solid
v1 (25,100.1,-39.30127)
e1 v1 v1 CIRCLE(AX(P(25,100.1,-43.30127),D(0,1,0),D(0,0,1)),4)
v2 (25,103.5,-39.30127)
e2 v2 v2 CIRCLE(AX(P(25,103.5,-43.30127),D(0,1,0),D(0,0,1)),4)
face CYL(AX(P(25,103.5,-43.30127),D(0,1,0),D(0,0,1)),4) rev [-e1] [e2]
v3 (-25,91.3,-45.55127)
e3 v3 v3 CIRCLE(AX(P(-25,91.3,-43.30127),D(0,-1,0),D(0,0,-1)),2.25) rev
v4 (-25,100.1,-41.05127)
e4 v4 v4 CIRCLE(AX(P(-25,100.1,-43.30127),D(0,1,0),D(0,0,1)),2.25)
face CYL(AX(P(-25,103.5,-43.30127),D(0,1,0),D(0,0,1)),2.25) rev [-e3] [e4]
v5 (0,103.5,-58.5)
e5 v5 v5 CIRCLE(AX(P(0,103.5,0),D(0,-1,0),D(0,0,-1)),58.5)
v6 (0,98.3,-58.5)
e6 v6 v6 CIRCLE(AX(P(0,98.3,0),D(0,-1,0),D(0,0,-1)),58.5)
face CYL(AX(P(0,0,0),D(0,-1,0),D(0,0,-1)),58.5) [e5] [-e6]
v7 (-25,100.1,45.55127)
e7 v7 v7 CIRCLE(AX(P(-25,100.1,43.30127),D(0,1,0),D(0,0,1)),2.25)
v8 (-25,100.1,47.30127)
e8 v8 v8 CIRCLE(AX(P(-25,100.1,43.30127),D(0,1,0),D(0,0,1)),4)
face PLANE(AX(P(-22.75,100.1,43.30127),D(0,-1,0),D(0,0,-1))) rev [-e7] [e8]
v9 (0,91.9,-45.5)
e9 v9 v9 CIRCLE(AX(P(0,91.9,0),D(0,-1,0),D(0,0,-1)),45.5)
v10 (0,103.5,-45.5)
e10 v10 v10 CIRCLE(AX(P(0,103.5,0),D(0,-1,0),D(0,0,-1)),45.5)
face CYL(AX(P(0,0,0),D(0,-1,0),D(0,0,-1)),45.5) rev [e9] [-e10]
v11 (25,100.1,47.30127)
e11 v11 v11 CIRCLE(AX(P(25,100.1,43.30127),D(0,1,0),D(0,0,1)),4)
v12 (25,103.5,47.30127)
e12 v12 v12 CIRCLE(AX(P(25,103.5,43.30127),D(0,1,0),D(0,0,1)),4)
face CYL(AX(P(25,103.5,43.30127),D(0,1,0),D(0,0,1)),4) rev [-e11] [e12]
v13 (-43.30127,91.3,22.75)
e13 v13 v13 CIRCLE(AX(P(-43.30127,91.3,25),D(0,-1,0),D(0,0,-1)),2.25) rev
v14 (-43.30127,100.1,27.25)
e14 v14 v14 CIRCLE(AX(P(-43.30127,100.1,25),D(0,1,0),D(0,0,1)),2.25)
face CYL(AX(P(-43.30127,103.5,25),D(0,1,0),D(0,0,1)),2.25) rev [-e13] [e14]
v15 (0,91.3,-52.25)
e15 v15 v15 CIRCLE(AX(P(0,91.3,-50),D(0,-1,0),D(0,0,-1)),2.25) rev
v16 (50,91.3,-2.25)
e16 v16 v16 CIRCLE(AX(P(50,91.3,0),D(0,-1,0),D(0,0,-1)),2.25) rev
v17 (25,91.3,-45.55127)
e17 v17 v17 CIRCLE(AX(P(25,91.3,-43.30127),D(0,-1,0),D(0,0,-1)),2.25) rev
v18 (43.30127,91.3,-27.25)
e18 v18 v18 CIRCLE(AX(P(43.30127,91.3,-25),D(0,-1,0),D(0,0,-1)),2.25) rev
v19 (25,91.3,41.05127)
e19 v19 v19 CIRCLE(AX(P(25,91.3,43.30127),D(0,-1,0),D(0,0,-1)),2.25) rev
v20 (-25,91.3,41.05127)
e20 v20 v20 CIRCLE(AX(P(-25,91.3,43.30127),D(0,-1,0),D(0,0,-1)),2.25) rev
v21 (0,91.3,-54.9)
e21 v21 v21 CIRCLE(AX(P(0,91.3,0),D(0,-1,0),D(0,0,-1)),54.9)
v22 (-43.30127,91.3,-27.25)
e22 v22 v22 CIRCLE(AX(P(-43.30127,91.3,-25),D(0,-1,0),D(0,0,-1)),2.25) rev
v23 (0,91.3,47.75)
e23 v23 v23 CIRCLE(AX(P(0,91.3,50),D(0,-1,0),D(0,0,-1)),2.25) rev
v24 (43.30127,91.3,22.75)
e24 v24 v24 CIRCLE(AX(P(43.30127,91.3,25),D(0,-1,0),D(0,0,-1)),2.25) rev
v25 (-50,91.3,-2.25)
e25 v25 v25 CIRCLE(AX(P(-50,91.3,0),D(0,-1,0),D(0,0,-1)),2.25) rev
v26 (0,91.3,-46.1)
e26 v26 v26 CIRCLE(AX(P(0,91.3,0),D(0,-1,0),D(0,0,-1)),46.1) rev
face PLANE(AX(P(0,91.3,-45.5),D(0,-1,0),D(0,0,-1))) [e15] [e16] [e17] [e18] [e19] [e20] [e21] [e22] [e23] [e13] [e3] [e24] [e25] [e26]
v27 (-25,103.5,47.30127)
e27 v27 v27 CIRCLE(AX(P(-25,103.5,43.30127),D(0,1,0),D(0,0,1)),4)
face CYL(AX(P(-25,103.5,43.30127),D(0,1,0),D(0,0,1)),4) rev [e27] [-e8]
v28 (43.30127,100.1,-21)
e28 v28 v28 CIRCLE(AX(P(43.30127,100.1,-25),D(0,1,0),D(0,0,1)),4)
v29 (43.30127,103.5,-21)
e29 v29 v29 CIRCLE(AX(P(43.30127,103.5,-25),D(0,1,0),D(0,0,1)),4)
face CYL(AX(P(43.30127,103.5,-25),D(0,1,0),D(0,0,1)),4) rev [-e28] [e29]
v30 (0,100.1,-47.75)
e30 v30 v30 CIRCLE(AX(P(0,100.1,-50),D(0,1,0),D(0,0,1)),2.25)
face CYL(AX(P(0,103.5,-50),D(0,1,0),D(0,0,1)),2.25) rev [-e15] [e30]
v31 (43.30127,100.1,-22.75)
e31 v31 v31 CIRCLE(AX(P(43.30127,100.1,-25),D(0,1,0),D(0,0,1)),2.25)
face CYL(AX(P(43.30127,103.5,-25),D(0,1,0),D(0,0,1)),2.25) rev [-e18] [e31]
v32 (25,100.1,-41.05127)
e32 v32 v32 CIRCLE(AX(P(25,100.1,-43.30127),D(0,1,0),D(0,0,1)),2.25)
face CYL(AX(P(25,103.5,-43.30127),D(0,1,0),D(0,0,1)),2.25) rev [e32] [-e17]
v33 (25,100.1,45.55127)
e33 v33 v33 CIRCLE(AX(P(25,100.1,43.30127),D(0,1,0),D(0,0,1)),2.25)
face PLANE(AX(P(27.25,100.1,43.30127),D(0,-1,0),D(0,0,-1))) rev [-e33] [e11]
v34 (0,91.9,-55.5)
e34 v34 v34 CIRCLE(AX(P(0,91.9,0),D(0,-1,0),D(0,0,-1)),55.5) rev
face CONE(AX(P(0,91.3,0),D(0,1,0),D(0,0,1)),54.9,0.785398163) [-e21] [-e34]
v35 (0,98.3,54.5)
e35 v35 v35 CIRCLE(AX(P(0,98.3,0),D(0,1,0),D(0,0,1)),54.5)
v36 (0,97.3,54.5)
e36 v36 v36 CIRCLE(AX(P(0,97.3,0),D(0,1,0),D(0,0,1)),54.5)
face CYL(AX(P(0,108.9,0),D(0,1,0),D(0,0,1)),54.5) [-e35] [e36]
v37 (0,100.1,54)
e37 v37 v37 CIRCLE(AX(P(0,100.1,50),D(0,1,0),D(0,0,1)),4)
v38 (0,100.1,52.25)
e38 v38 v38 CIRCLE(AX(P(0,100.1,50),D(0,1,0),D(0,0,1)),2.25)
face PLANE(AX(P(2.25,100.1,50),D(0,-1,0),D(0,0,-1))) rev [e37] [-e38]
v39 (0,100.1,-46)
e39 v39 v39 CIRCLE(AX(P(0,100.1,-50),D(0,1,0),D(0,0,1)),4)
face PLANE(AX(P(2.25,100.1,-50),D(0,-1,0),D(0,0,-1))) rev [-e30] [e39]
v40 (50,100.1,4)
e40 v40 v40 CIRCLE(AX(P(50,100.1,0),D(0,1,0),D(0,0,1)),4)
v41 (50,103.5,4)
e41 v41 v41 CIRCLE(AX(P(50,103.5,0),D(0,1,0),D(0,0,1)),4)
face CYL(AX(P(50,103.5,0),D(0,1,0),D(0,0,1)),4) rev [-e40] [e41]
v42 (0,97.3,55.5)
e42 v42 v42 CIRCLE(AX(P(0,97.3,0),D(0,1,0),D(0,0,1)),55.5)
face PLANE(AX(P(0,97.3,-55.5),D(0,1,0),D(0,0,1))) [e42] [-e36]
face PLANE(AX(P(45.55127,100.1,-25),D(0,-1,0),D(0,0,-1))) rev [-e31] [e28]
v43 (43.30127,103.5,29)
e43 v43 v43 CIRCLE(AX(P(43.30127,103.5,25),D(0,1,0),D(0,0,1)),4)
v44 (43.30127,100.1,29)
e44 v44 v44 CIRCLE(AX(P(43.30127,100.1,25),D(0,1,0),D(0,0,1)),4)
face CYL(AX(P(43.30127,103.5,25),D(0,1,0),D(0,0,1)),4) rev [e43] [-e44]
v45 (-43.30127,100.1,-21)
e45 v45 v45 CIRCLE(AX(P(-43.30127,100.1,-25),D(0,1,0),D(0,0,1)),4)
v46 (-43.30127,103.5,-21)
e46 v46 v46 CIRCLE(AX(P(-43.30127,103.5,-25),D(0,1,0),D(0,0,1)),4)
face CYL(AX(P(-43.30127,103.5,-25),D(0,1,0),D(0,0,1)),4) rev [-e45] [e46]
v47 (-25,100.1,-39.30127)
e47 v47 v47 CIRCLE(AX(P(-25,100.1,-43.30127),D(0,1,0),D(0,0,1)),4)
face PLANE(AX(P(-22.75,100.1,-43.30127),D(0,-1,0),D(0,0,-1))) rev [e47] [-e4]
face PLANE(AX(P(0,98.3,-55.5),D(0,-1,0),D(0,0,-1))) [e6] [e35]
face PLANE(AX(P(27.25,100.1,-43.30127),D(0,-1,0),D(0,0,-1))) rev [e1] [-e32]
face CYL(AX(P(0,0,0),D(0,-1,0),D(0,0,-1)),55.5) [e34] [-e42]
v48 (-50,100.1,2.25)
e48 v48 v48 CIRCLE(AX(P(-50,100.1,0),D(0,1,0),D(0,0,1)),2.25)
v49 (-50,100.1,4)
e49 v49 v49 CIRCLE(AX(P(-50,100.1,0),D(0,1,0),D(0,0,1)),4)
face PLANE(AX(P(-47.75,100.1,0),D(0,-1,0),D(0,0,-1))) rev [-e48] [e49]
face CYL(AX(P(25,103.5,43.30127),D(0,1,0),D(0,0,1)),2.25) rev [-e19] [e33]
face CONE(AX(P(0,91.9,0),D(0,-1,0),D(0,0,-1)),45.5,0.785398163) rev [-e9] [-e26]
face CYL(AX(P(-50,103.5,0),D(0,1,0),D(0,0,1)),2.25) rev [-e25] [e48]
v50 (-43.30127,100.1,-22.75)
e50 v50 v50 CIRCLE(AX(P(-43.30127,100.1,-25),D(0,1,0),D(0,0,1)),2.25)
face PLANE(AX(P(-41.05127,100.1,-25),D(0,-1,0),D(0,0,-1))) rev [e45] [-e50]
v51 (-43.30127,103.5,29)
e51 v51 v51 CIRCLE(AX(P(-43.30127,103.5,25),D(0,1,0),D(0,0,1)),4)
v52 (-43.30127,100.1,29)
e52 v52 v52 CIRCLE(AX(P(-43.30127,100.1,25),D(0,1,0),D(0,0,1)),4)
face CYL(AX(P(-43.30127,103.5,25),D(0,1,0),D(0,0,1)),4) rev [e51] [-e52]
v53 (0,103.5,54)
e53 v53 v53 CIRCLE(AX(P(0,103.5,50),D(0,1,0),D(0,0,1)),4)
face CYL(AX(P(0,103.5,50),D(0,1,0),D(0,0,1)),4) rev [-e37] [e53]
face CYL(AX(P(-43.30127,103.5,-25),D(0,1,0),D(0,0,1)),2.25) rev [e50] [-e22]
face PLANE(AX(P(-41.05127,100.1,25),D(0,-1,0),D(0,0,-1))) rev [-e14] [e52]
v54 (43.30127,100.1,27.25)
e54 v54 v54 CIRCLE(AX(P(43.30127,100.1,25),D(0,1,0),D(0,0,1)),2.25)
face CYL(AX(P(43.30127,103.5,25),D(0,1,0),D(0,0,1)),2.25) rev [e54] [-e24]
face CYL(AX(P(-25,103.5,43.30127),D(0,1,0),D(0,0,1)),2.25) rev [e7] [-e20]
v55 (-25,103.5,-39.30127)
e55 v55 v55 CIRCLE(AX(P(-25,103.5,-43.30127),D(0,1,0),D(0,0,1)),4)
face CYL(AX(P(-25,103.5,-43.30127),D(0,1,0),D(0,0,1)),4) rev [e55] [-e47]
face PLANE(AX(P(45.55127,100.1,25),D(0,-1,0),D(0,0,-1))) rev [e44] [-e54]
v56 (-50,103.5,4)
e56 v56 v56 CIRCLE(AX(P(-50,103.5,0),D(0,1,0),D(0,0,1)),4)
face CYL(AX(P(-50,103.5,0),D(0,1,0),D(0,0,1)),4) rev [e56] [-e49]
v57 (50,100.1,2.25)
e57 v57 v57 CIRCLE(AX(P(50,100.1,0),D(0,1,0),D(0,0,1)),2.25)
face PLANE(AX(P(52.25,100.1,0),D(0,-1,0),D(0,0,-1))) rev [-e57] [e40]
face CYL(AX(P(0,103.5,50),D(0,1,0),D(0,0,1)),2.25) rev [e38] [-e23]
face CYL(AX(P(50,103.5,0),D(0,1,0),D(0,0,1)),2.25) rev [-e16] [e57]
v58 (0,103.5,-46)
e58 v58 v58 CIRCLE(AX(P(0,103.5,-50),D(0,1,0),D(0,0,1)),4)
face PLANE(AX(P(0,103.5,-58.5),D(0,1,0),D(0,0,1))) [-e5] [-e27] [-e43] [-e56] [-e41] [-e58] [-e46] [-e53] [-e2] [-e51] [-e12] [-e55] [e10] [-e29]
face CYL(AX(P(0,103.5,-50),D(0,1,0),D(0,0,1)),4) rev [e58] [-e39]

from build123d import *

# Parameters (mm, degrees)
CBORE_FOR_M4_HEX_SOCKET_HEAD_CAP_SCR_2_COUNT  = 2
CBORE_FOR_M4_HEX_SOCKET_HEAD_CAP_SCR_2_PITCH  = 25.88190451
CBORE_FOR_M4_HEX_SOCKET_HEAD_CAP_SCR_3_COUNT  = 2
CBORE_FOR_M4_HEX_SOCKET_HEAD_CAP_SCR_3_PITCH  = 50
CBORE_FOR_M4_HEX_SOCKET_HEAD_CAP_SCR_4_COUNT  = 2
CBORE_FOR_M4_HEX_SOCKET_HEAD_CAP_SCR_4_PITCH  = 70.710678119
CBORE_FOR_M4_HEX_SOCKET_HEAD_CAP_SCR_5_COUNT  = 2
CBORE_FOR_M4_HEX_SOCKET_HEAD_CAP_SCR_5_PITCH  = 86.602540378
CBORE_FOR_M4_HEX_SOCKET_HEAD_CAP_SCR_6_COUNT  = 2
CBORE_FOR_M4_HEX_SOCKET_HEAD_CAP_SCR_6_PITCH  = 96.592582629
CBORE_FOR_M4_HEX_SOCKET_HEAD_CAP_SCR_7_COUNT  = 2
CBORE_FOR_M4_HEX_SOCKET_HEAD_CAP_SCR_7_PITCH  = 100
CBORE_FOR_M4_HEX_SOCKET_HEAD_CAP_SCR_8_COUNT  = 2
CBORE_FOR_M4_HEX_SOCKET_HEAD_CAP_SCR_8_PITCH  = 96.592582629
CBORE_FOR_M4_HEX_SOCKET_HEAD_CAP_SCR_9_COUNT  = 2
CBORE_FOR_M4_HEX_SOCKET_HEAD_CAP_SCR_9_PITCH  = 86.602540378
CBORE_FOR_M4_HEX_SOCKET_HEAD_CAP_SCR_10_COUNT = 2
CBORE_FOR_M4_HEX_SOCKET_HEAD_CAP_SCR_10_PITCH = 70.710678119
CBORE_FOR_M4_HEX_SOCKET_HEAD_CAP_SCR_11_COUNT = 2
CBORE_FOR_M4_HEX_SOCKET_HEAD_CAP_SCR_11_PITCH = 50
CBORE_FOR_M4_HEX_SOCKET_HEAD_CAP_SCR_12_COUNT = 2
CBORE_FOR_M4_HEX_SOCKET_HEAD_CAP_SCR_12_PITCH = 25.88190451
M4_TAPPED_HOLE1_AT_2_COUNT                    = 2
M4_TAPPED_HOLE1_AT_2_PITCH                    = 25.88190451
M4_TAPPED_HOLE1_AT_3_COUNT                    = 2
M4_TAPPED_HOLE1_AT_3_PITCH                    = 50
M4_TAPPED_HOLE1_AT_4_COUNT                    = 2
M4_TAPPED_HOLE1_AT_4_PITCH                    = 70.710678119
M4_TAPPED_HOLE1_AT_5_COUNT                    = 2
M4_TAPPED_HOLE1_AT_5_PITCH                    = 86.602540378
M4_TAPPED_HOLE1_AT_6_COUNT                    = 2
M4_TAPPED_HOLE1_AT_6_PITCH                    = 96.592582629
M4_TAPPED_HOLE1_AT_7_COUNT                    = 2
M4_TAPPED_HOLE1_AT_7_PITCH                    = 100
M4_TAPPED_HOLE1_AT_8_COUNT                    = 2
M4_TAPPED_HOLE1_AT_8_PITCH                    = 96.592582629
M4_TAPPED_HOLE1_AT_9_COUNT                    = 2
M4_TAPPED_HOLE1_AT_9_PITCH                    = 86.602540378
M4_TAPPED_HOLE1_AT_10_COUNT                   = 2
M4_TAPPED_HOLE1_AT_10_PITCH                   = 70.710678119
M4_TAPPED_HOLE1_AT_11_COUNT                   = 2
M4_TAPPED_HOLE1_AT_11_PITCH                   = 50
M4_TAPPED_HOLE1_AT_12_COUNT                   = 2
M4_TAPPED_HOLE1_AT_12_PITCH                   = 25.88190451
SKETCH36_W                                    = 2.25
SKETCH36_H                                    = 3.5
M4_CLEARANCE_HOLE1_AT_2_COUNT                 = 2
M4_CLEARANCE_HOLE1_AT_2_PITCH                 = 35.58955921
M4_CLEARANCE_HOLE1_AT_3_COUNT                 = 2
M4_CLEARANCE_HOLE1_AT_3_PITCH                 = 65.76093065
M4_CLEARANCE_HOLE1_AT_4_COUNT                 = 2
M4_CLEARANCE_HOLE1_AT_4_PITCH                 = 85.920796524
M4_CLEARANCE_HOLE1_AT_5_COUNT                 = 2
M4_CLEARANCE_HOLE1_AT_5_PITCH                 = 93
M4_CLEARANCE_HOLE1_AT_6_COUNT                 = 2
M4_CLEARANCE_HOLE1_AT_6_PITCH                 = 85.920796524
M4_CLEARANCE_HOLE1_AT_7_COUNT                 = 2
M4_CLEARANCE_HOLE1_AT_7_PITCH                 = 65.76093065
M4_CLEARANCE_HOLE1_AT_8_COUNT                 = 2
M4_CLEARANCE_HOLE1_AT_8_PITCH                 = 35.58955921
M4_TAPPED_HOLE2_AT_2_COUNT                    = 2
M4_TAPPED_HOLE2_AT_2_PITCH                    = 35.58955921
M4_TAPPED_HOLE2_AT_3_COUNT                    = 2
M4_TAPPED_HOLE2_AT_3_PITCH                    = 35.58955921
M4_TAPPED_HOLE2_AT_4_COUNT                    = 2
M4_TAPPED_HOLE2_AT_4_PITCH                    = 65.76093065
M4_TAPPED_HOLE2_AT_5_COUNT                    = 2
M4_TAPPED_HOLE2_AT_5_PITCH                    = 65.76093065
M4_TAPPED_HOLE2_AT_6_COUNT                    = 2
M4_TAPPED_HOLE2_AT_6_PITCH                    = 85.920796524
M4_TAPPED_HOLE2_AT_7_COUNT                    = 2
M4_TAPPED_HOLE2_AT_7_PITCH                    = 93
M4_TAPPED_HOLE2_AT_8_COUNT                    = 2
M4_TAPPED_HOLE2_AT_8_PITCH                    = 85.920796524
SKETCH53_W                                    = 2.5
SKETCH53_H                                    = 54.5
M6_TAPPED_HOLE1_AT_2_COUNT                    = 2
M6_TAPPED_HOLE1_AT_2_PITCH                    = 45
MIRROR1_COPY_1_SKETCH_W                       = 2.5
MIRROR1_COPY_1_SKETCH_H                       = 54.5
SKETCH66_W                                    = 2.5
SKETCH66_H                                    = 54.5
M6_TAPPED_HOLE2_AT_2_COUNT                    = 2
M6_TAPPED_HOLE2_AT_2_PITCH                    = 45
MIRROR2_COPY_1_SKETCH_W                       = 2.5
MIRROR2_COPY_1_SKETCH_H                       = 54.5
SKETCH69_W                                    = 1
SKETCH69_H                                    = 1
CHAMFER5_SIZE                                 = 0.5
MOVE_FACE2_BY                                 = 0.5
MOVE_FACE3_BY                                 = 1
CHAMFER1_SIZE                                 = 0.6
CHAMFER2_SIZE                                 = 0.6
FILLET3_R                                     = 0.4
CHAMFER3_SIZE                                 = 2
M6_START                                      = -56
M6_TAPPED_HOLE3_OUTLINE_R                     = 2.5
M6_TAPPED_HOLE3_DEPTH                         = 14
CHAMFER4_SIZE                                 = 0.6
CHAMFER6_SIZE                                 = 0.6
FILLET4_R                                     = 0.4
CHAMFER7_SIZE                                 = 1
CHAMFER7_SIZE2                                = 1.732050808
CHAMFER8_SIZE                                 = 0.5
CHAMFER8_SIZE2                                = 0.866025404


with BuildPart() as part:
    # Sketch1 → Revolve1 (revolve)
    with BuildSketch(Plane(origin=(0, 0, 0), x_dir=(0, 0, -1), z_dir=(1, 0, 0))):
        Polygon((37, 103.8), (37, 100.8), (30.5, 100.8), (30.5, 96.8), (40, 93), (40, 91), (42.5, 91), (42.5, 78), (43, 78), (43, -18.5), (42.5, -18.5), (42.5, -31.5), (42.5, -32.5), (50.5, -32.5), (50.5, -36), (54.5, -36), (54.5, -32.5), (54.5, 43.7), (58.5, 43.7), (58.5, 49.7), (55.5, 49.7), (55.5, 57.7), (54.5, 57.7), (54.5, 90.3), (45.5, 90.3), (45.5, 103.8), (42.5, 103.8), align=None)
    revolve(axis=Axis((0, 0, 0), (0, 1, 0)))

    # Sketch56 → Cut-Revolve1 (revolve, cut)
    with BuildSketch(Plane(origin=(0, 0, 0), x_dir=(0, 0, -1), z_dir=(1, 0, 0))):
        Polygon((45.5, 103.8), (37, 103.8), (0, 103.8), (0, 93), (40, 93), (45.5, 93), align=None)
    revolve(axis=Axis((0, 108.9, 0), (0, -1, 0)), mode=Mode.SUBTRACT)

    # Sketch57 → Revolve4 (revolve)
    with BuildSketch(Plane(origin=(0, 0, 0), x_dir=(0, 0, -1), z_dir=(1, 0, 0))):
        Polygon((29.65, 98), (45.5, 98), (45.5, 93), (40, 93), (40, 95), (23.25, 95), (20.25, 95), (20.25, 102), (29.65, 102), align=None)
    revolve(axis=Axis((0, 108.9, 0), (0, -1, 0)))

    # Sketch22 → M4 Tapped Hole1 (revolve, cut)
    with BuildSketch(Plane(origin=(0, 90.3, -50), x_dir=(0, 0, 1), z_dir=(1, 0, 0))):
        Polygon((0, 0), (0, 11.091420021), (1.65, 10.1), (1.65, 0), align=None)
    m4_tapped_hole1 = revolve(axis=Axis((0, 96.65, -50), (0, -1, 0)), mode=Mode.SUBTRACT)

    # M4 Tapped Hole1 at 2: M4 Tapped Hole1 ×2
    with Locations(*[Vector(0.9659258262890645, 0, 0.2588190451025349) * (i * M4_TAPPED_HOLE1_AT_2_PITCH) for i in range(1, M4_TAPPED_HOLE1_AT_2_COUNT)]):
        add(m4_tapped_hole1, mode=Mode.SUBTRACT)

    # M4 Tapped Hole1 at 3: M4 Tapped Hole1 ×2
    with Locations(*[Vector(0.8660254037844238, 0, 0.5000000000000259) * (i * M4_TAPPED_HOLE1_AT_3_PITCH) for i in range(1, M4_TAPPED_HOLE1_AT_3_COUNT)]):
        add(m4_tapped_hole1, mode=Mode.SUBTRACT)

    # M4 Tapped Hole1 at 4: M4 Tapped Hole1 ×2
    with Locations(*[Vector(0.7071067811865159, 0, 0.7071067811865791) * (i * M4_TAPPED_HOLE1_AT_4_PITCH) for i in range(1, M4_TAPPED_HOLE1_AT_4_COUNT)]):
        add(m4_tapped_hole1, mode=Mode.SUBTRACT)

    # M4 Tapped Hole1 at 5: M4 Tapped Hole1 ×2
    with Locations(*[Vector(0.4999999999999484, 0, 0.8660254037844685) * (i * M4_TAPPED_HOLE1_AT_5_PITCH) for i in range(1, M4_TAPPED_HOLE1_AT_5_COUNT)]):
        add(m4_tapped_hole1, mode=Mode.SUBTRACT)

    # M4 Tapped Hole1 at 6: M4 Tapped Hole1 ×2
    with Locations(*[Vector(0.2588190451024489, 0, 0.9659258262890876) * (i * M4_TAPPED_HOLE1_AT_6_PITCH) for i in range(1, M4_TAPPED_HOLE1_AT_6_COUNT)]):
        add(m4_tapped_hole1, mode=Mode.SUBTRACT)

    # M4 Tapped Hole1 at 7: M4 Tapped Hole1 ×2
    with Locations(*[(0, 0, i * M4_TAPPED_HOLE1_AT_7_PITCH) for i in range(1, M4_TAPPED_HOLE1_AT_7_COUNT)]):
        add(m4_tapped_hole1, mode=Mode.SUBTRACT)

    # M4 Tapped Hole1 at 8: M4 Tapped Hole1 ×2
    with Locations(*[Vector(-0.2588190451026216, 0, 0.9659258262890413) * (i * M4_TAPPED_HOLE1_AT_8_PITCH) for i in range(1, M4_TAPPED_HOLE1_AT_8_COUNT)]):
        add(m4_tapped_hole1, mode=Mode.SUBTRACT)

    # M4 Tapped Hole1 at 9: M4 Tapped Hole1 ×2
    with Locations(*[Vector(-0.5000000000001033, 0, 0.8660254037843791) * (i * M4_TAPPED_HOLE1_AT_9_PITCH) for i in range(1, M4_TAPPED_HOLE1_AT_9_COUNT)]):
        add(m4_tapped_hole1, mode=Mode.SUBTRACT)

    # M4 Tapped Hole1 at 10: M4 Tapped Hole1 ×2
    with Locations(*[Vector(-0.7071067811866423, 0, 0.7071067811864528) * (i * M4_TAPPED_HOLE1_AT_10_PITCH) for i in range(1, M4_TAPPED_HOLE1_AT_10_COUNT)]):
        add(m4_tapped_hole1, mode=Mode.SUBTRACT)

    # M4 Tapped Hole1 at 11: M4 Tapped Hole1 ×2
    with Locations(*[Vector(-0.8660254037845131, 0, 0.4999999999998711) * (i * M4_TAPPED_HOLE1_AT_11_PITCH) for i in range(1, M4_TAPPED_HOLE1_AT_11_COUNT)]):
        add(m4_tapped_hole1, mode=Mode.SUBTRACT)

    # M4 Tapped Hole1 at 12: M4 Tapped Hole1 ×2
    with Locations(*[Vector(-0.9659258262891108, 0, 0.2588190451023622) * (i * M4_TAPPED_HOLE1_AT_12_PITCH) for i in range(1, M4_TAPPED_HOLE1_AT_12_COUNT)]):
        add(m4_tapped_hole1, mode=Mode.SUBTRACT)

    # Sketch39 → M4 Tapped Hole2 (revolve, cut)
    with BuildSketch(Plane(origin=(17.794779605, -32.5, -42.960398262), x_dir=(0, 0, -1), z_dir=(1, 0, 0))):
        Polygon((0, 0), (0, 10.991420021), (1.65, 10), (1.65, 0), align=None)
    m4_tapped_hole2 = revolve(axis=Axis((17.794779605, -38.85, -42.960398262), (0, 1, 0)), mode=Mode.SUBTRACT)

    # M4 Tapped Hole2 at 2: M4 Tapped Hole2 ×2
    with Locations(*[Vector(0.7071067811867017, 0, 0.7071067811863935) * (i * M4_TAPPED_HOLE2_AT_2_PITCH) for i in range(1, M4_TAPPED_HOLE2_AT_2_COUNT)]):
        add(m4_tapped_hole2, mode=Mode.SUBTRACT)

    # M4 Tapped Hole2 at 3: M4 Tapped Hole2 ×2
    with Locations(*[(-i * M4_TAPPED_HOLE2_AT_3_PITCH, 0, 0) for i in range(1, M4_TAPPED_HOLE2_AT_3_COUNT)]):
        add(m4_tapped_hole2, mode=Mode.SUBTRACT)

    # M4 Tapped Hole2 at 4: M4 Tapped Hole2 ×2
    with Locations(*[Vector(-0.9238795325112329, 0, 0.38268343236522007) * (i * M4_TAPPED_HOLE2_AT_4_PITCH) for i in range(1, M4_TAPPED_HOLE2_AT_4_COUNT)]):
        add(m4_tapped_hole2, mode=Mode.SUBTRACT)

    # M4 Tapped Hole2 at 5: M4 Tapped Hole2 ×2
    with Locations(*[Vector(0.38268343236527674, 0, 0.9238795325112094) * (i * M4_TAPPED_HOLE2_AT_5_PITCH) for i in range(1, M4_TAPPED_HOLE2_AT_5_COUNT)]):
        add(m4_tapped_hole2, mode=Mode.SUBTRACT)

    # M4 Tapped Hole2 at 6: M4 Tapped Hole2 ×2
    with Locations(*[(0, 0, i * M4_TAPPED_HOLE2_AT_6_PITCH) for i in range(1, M4_TAPPED_HOLE2_AT_6_COUNT)]):
        add(m4_tapped_hole2, mode=Mode.SUBTRACT)

    # M4 Tapped Hole2 at 7: M4 Tapped Hole2 ×2
    with Locations(*[Vector(-0.38268343236493113, 0, 0.9238795325113525) * (i * M4_TAPPED_HOLE2_AT_7_PITCH) for i in range(1, M4_TAPPED_HOLE2_AT_7_COUNT)]):
        add(m4_tapped_hole2, mode=Mode.SUBTRACT)

    # M4 Tapped Hole2 at 8: M4 Tapped Hole2 ×2
    with Locations(*[Vector(-0.707106781186437, 0, 0.707106781186658) * (i * M4_TAPPED_HOLE2_AT_8_PITCH) for i in range(1, M4_TAPPED_HOLE2_AT_8_COUNT)]):
        add(m4_tapped_hole2, mode=Mode.SUBTRACT)

    # Sketch53 → M6 Tapped Hole1 (revolve, cut)
    with BuildSketch(Plane(origin=(38.537319575, 30.5, 38.537319575), x_dir=(0.7071067811865464, 0, -0.7071067811865487), z_dir=(0, 1, 0))):
        with Locations((1.25, 27.25)):
            Rectangle(SKETCH53_W, SKETCH53_H)
    m6_tapped_hole1 = revolve(axis=Axis((43.027447635, 30.5, 43.027447635), (-0.7071067811865487, 0, -0.7071067811865464)), mode=Mode.SUBTRACT)

    # M6 Tapped Hole1 at 2: M6 Tapped Hole1 ×2
    with Locations(*[(0, -i * M6_TAPPED_HOLE1_AT_2_PITCH, 0) for i in range(1, M6_TAPPED_HOLE1_AT_2_COUNT)]):
        add(m6_tapped_hole1, mode=Mode.SUBTRACT)

    # Mirror1: M6 Tapped Hole1 across plane
    add(m6_tapped_hole1.mirror(Plane(origin=(0, 0, 0), x_dir=(0, 0, 1), z_dir=(1, 0, 0))), mode=Mode.SUBTRACT)

    # Mirror1 copy 1 sketch → Mirror1 copy 1 (revolve, cut)
    with BuildSketch(Plane(origin=(-38.537319575, -14.5, 38.537319575), x_dir=(-0.7071067811865464, 0, -0.7071067811865487), z_dir=(0, 1, 0))):
        with Locations((1.25, -27.25)):
            Rectangle(MIRROR1_COPY_1_SKETCH_W, MIRROR1_COPY_1_SKETCH_H)
    revolve(axis=Axis((-43.027447635, -14.5, 43.027447635), (-0.7071067811865487, 0, 0.7071067811865464)), mode=Mode.SUBTRACT)

    # AdvancedHole1: read off the stored shape, not the designer's step
    # AdvancedHole1 outline → AdvancedHole1 (revolve, cut)
    with BuildSketch(Plane.XY.offset(22.75)):
        Polygon((0.8, 100.5), (1.2, 100.5), (1.2, 102), (0, 102), (0, 96.019311506), (0.8, 96.5), align=None)
    revolve(axis=Axis((0, 0, 22.75), (0, 1, 0)), mode=Mode.SUBTRACT)

    # AdvancedHole1 2 outline → AdvancedHole1 2 (revolve, cut)
    with BuildSketch(Plane(origin=(19.702077936, 0, -11.375), x_dir=(1, 0, 0), z_dir=(0, 0, 1))):
        Polygon((1.2, 102), (0, 102), (0, 96.019311506), (0.8, 96.5), (0.8, 100.5), (1.2, 100.5), align=None)
    revolve(axis=Axis((19.702077936, 0, -11.375), (0, 1, 0)), mode=Mode.SUBTRACT)

    # AdvancedHole1 3 outline → AdvancedHole1 3 (revolve, cut)
    with BuildSketch(Plane(origin=(-19.702077936, 0, -11.375), x_dir=(1, 0, 0), z_dir=(0, 0, 1))):
        Polygon((1.2, 102), (0, 102), (0, 96.019311506), (0.8, 96.5), (0.8, 100.5), (1.2, 100.5), align=None)
    revolve(axis=Axis((-19.702077936, 0, -11.375), (0, 1, 0)), mode=Mode.SUBTRACT)

    # Sketch66 → M6 Tapped Hole2 (revolve, cut)
    with BuildSketch(Plane(origin=(31.259915781, 30.5, 44.643786414), x_dir=(0.819152044288993, 0, -0.5735764363510444), z_dir=(0, 1, 0))):
        with Locations((1.25, 27.25)):
            Rectangle(SKETCH66_W, SKETCH66_H)
    m6_tapped_hole2 = revolve(axis=Axis((34.902126152, 30.5, 49.845401895), (-0.5735764363510444, 0, -0.8191520442889929)), mode=Mode.SUBTRACT)

    # M6 Tapped Hole2 at 2: M6 Tapped Hole2 ×2
    with Locations(*[(0, -i * M6_TAPPED_HOLE2_AT_2_PITCH, 0) for i in range(1, M6_TAPPED_HOLE2_AT_2_COUNT)]):
        add(m6_tapped_hole2, mode=Mode.SUBTRACT)

    # Mirror2: M6 Tapped Hole2 across plane
    add(m6_tapped_hole2.mirror(Plane(origin=(0, 0, 0), x_dir=(0, 0, 1), z_dir=(1, 0, 0))), mode=Mode.SUBTRACT)

    # Mirror2 copy 1 sketch → Mirror2 copy 1 (revolve, cut)
    with BuildSketch(Plane(origin=(-31.259915781, -14.5, 44.643786414), x_dir=(-0.819152044288993, 0, -0.5735764363510444), z_dir=(0, 1, 0))):
        with Locations((1.25, -27.25)):
            Rectangle(MIRROR2_COPY_1_SKETCH_W, MIRROR2_COPY_1_SKETCH_H)
    revolve(axis=Axis((-34.902126152, -14.5, 49.845401895), (-0.5735764363510444, 0, 0.8191520442889929)), mode=Mode.SUBTRACT)


with BuildPart() as body_2:
    # Sketch2 → Revolve2 (revolve)
    with BuildSketch(Plane(origin=(0, 0, 0), x_dir=(0, 0, -1), z_dir=(1, 0, 0)), mode=Mode.PRIVATE) as revolve2_sk:
        Polygon((42.5, -31.5), (40, -31.5), (40, -36), (50.5, -36), (50.5, -32.5), (42.5, -32.5), align=None)
    revolve(revolve2_sk.sketch.rotate(Axis((0, 108.9, 0), (0, -1, 0)), 180), axis=Axis((0, 108.9, 0), (0, -1, 0)))

    # Sketch36 → M4 Clearance Hole1 (revolve, cut)
    with BuildSketch(Plane(origin=(17.794779605, -36, -42.960398262), x_dir=(0, 0, -1), z_dir=(1, 0, 0))):
        with Locations((1.125, 1.75)):
            Rectangle(SKETCH36_W, SKETCH36_H)
    m4_clearance_hole1 = revolve(axis=Axis((17.794779605, -42.35, -42.960398262), (0, 1, 0)), mode=Mode.SUBTRACT)

    # M4 Clearance Hole1 at 2: M4 Clearance Hole1 ×2
    with Locations(*[(-i * M4_CLEARANCE_HOLE1_AT_2_PITCH, 0, 0) for i in range(1, M4_CLEARANCE_HOLE1_AT_2_COUNT)]):
        add(m4_clearance_hole1, mode=Mode.SUBTRACT)

    # M4 Clearance Hole1 at 3: M4 Clearance Hole1 ×2
    with Locations(*[Vector(-0.9238795325112329, 0, 0.38268343236522007) * (i * M4_CLEARANCE_HOLE1_AT_3_PITCH) for i in range(1, M4_CLEARANCE_HOLE1_AT_3_COUNT)]):
        add(m4_clearance_hole1, mode=Mode.SUBTRACT)

    # M4 Clearance Hole1 at 4: M4 Clearance Hole1 ×2
    with Locations(*[Vector(-0.707106781186437, 0, 0.707106781186658) * (i * M4_CLEARANCE_HOLE1_AT_4_PITCH) for i in range(1, M4_CLEARANCE_HOLE1_AT_4_COUNT)]):
        add(m4_clearance_hole1, mode=Mode.SUBTRACT)

    # M4 Clearance Hole1 at 5: M4 Clearance Hole1 ×2
    with Locations(*[Vector(-0.38268343236493113, 0, 0.9238795325113525) * (i * M4_CLEARANCE_HOLE1_AT_5_PITCH) for i in range(1, M4_CLEARANCE_HOLE1_AT_5_COUNT)]):
        add(m4_clearance_hole1, mode=Mode.SUBTRACT)

    # M4 Clearance Hole1 at 6: M4 Clearance Hole1 ×2
    with Locations(*[(0, 0, i * M4_CLEARANCE_HOLE1_AT_6_PITCH) for i in range(1, M4_CLEARANCE_HOLE1_AT_6_COUNT)]):
        add(m4_clearance_hole1, mode=Mode.SUBTRACT)

    # M4 Clearance Hole1 at 7: M4 Clearance Hole1 ×2
    with Locations(*[Vector(0.38268343236527674, 0, 0.9238795325112094) * (i * M4_CLEARANCE_HOLE1_AT_7_PITCH) for i in range(1, M4_CLEARANCE_HOLE1_AT_7_COUNT)]):
        add(m4_clearance_hole1, mode=Mode.SUBTRACT)

    # M4 Clearance Hole1 at 8: M4 Clearance Hole1 ×2
    with Locations(*[Vector(0.7071067811867017, 0, 0.7071067811863935) * (i * M4_CLEARANCE_HOLE1_AT_8_PITCH) for i in range(1, M4_CLEARANCE_HOLE1_AT_8_COUNT)]):
        add(m4_clearance_hole1, mode=Mode.SUBTRACT)

    # Move Face2: a face moved inward by 0.5
    extrude(body_2.faces().sort_by_distance((40.4, -32.5, -25.25))[0], amount=MOVE_FACE2_BY, dir=(0, -1, 0), mode=Mode.SUBTRACT)

    # Fillet3
    fillet3_edges = [body_2.edges().sort_by_distance(p)[0] for p in [
        (0, -33, -42.5),
    ]]
    fillet(fillet3_edges, radius=FILLET3_R)

    # Chamfer4
    chamfer4_edges = [body_2.edges().sort_by_distance(p)[0] for p in [
        (0, -33, -50.5),
    ]]
    chamfer(chamfer4_edges, length=CHAMFER4_SIZE)


with BuildPart() as body_3:
    # Sketch3 → Revolve3 (revolve)
    with BuildSketch(Plane(origin=(0, 0, 0), x_dir=(0, 0, -1), z_dir=(1, 0, 0))):
        Polygon((45.5, 90.3), (55.5, 90.3), (55.5, 98.3), (58.5, 98.3), (58.5, 103.5), (45.5, 103.5), align=None)
    revolve(axis=Axis((0, 0, 0), (0, 1, 0)))

    # Sketch19 → CBORE for M4 Hex Socket Head Cap Screw1 (revolve, cut)
    with BuildSketch(Plane(origin=(-25, 103.5, -43.301270189), x_dir=(0, 0, 1), z_dir=(1, 0, 0))):
        Polygon((0, 0), (0, 14.551936393), (2.25, 13.2), (2.25, 3.4), (4, 3.4), (4, 0), align=None)
    cbore_for_m4_hex_socket_head_cap_screw1 = revolve(axis=Axis((-25, 109.85, -43.301270189), (0, -1, 0)), mode=Mode.SUBTRACT)

    # CBORE for M4 Hex Socket Head Cap Scr 2: CBORE for M4 Hex Socket Head Cap Screw1 ×2
    with Locations(*[Vector(0.9659258262891108, 0, -0.2588190451023622) * (i * CBORE_FOR_M4_HEX_SOCKET_HEAD_CAP_SCR_2_PITCH) for i in range(1, CBORE_FOR_M4_HEX_SOCKET_HEAD_CAP_SCR_2_COUNT)]):
        add(cbore_for_m4_hex_socket_head_cap_screw1, mode=Mode.SUBTRACT)

    # CBORE for M4 Hex Socket Head Cap Scr 3: CBORE for M4 Hex Socket Head Cap Screw1 ×2
    with Locations(*[(i * CBORE_FOR_M4_HEX_SOCKET_HEAD_CAP_SCR_3_PITCH, 0, 0) for i in range(1, CBORE_FOR_M4_HEX_SOCKET_HEAD_CAP_SCR_3_COUNT)]):
        add(cbore_for_m4_hex_socket_head_cap_screw1, mode=Mode.SUBTRACT)

    # CBORE for M4 Hex Socket Head Cap Scr 4: CBORE for M4 Hex Socket Head Cap Screw1 ×2
    with Locations(*[Vector(0.9659258262890181, 0, 0.25881904510270803) * (i * CBORE_FOR_M4_HEX_SOCKET_HEAD_CAP_SCR_4_PITCH) for i in range(1, CBORE_FOR_M4_HEX_SOCKET_HEAD_CAP_SCR_4_COUNT)]):
        add(cbore_for_m4_hex_socket_head_cap_screw1, mode=Mode.SUBTRACT)

    # CBORE for M4 Hex Socket Head Cap Scr 5: CBORE for M4 Hex Socket Head Cap Screw1 ×2
    with Locations(*[Vector(0.8660254037843342, 0, 0.5000000000001809) * (i * CBORE_FOR_M4_HEX_SOCKET_HEAD_CAP_SCR_5_PITCH) for i in range(1, CBORE_FOR_M4_HEX_SOCKET_HEAD_CAP_SCR_5_COUNT)]):
        add(cbore_for_m4_hex_socket_head_cap_screw1, mode=Mode.SUBTRACT)

    # CBORE for M4 Hex Socket Head Cap Scr 6: CBORE for M4 Hex Socket Head Cap Screw1 ×2
    with Locations(*[Vector(0.7071067811863894, 0, 0.7071067811867057) * (i * CBORE_FOR_M4_HEX_SOCKET_HEAD_CAP_SCR_6_PITCH) for i in range(1, CBORE_FOR_M4_HEX_SOCKET_HEAD_CAP_SCR_6_COUNT)]):
        add(cbore_for_m4_hex_socket_head_cap_screw1, mode=Mode.SUBTRACT)

    # CBORE for M4 Hex Socket Head Cap Scr 7: CBORE for M4 Hex Socket Head Cap Screw1 ×2
    with Locations(*[Vector(0.4999999999997935, 0, 0.866025403784558) * (i * CBORE_FOR_M4_HEX_SOCKET_HEAD_CAP_SCR_7_PITCH) for i in range(1, CBORE_FOR_M4_HEX_SOCKET_HEAD_CAP_SCR_7_COUNT)]):
        add(cbore_for_m4_hex_socket_head_cap_screw1, mode=Mode.SUBTRACT)

    # CBORE for M4 Hex Socket Head Cap Scr 8: CBORE for M4 Hex Socket Head Cap Screw1 ×2
    with Locations(*[Vector(0.25881904510227594, 0, 0.9659258262891339) * (i * CBORE_FOR_M4_HEX_SOCKET_HEAD_CAP_SCR_8_PITCH) for i in range(1, CBORE_FOR_M4_HEX_SOCKET_HEAD_CAP_SCR_8_COUNT)]):
        add(cbore_for_m4_hex_socket_head_cap_screw1, mode=Mode.SUBTRACT)

    # CBORE for M4 Hex Socket Head Cap Scr 9: CBORE for M4 Hex Socket Head Cap Screw1 ×2
    with Locations(*[(0, 0, i * CBORE_FOR_M4_HEX_SOCKET_HEAD_CAP_SCR_9_PITCH) for i in range(1, CBORE_FOR_M4_HEX_SOCKET_HEAD_CAP_SCR_9_COUNT)]):
        add(cbore_for_m4_hex_socket_head_cap_screw1, mode=Mode.SUBTRACT)

    # CBORE for M4 Hex Socket Head Cap Scr 10: CBORE for M4 Hex Socket Head Cap Screw1 ×2
    with Locations(*[Vector(-0.2588190451027944, 0, 0.9659258262889949) * (i * CBORE_FOR_M4_HEX_SOCKET_HEAD_CAP_SCR_10_PITCH) for i in range(1, CBORE_FOR_M4_HEX_SOCKET_HEAD_CAP_SCR_10_COUNT)]):
        add(cbore_for_m4_hex_socket_head_cap_screw1, mode=Mode.SUBTRACT)

    # CBORE for M4 Hex Socket Head Cap Scr 11: CBORE for M4 Hex Socket Head Cap Screw1 ×2
    with Locations(*[Vector(-0.5000000000002581, 0, 0.8660254037842897) * (i * CBORE_FOR_M4_HEX_SOCKET_HEAD_CAP_SCR_11_PITCH) for i in range(1, CBORE_FOR_M4_HEX_SOCKET_HEAD_CAP_SCR_11_COUNT)]):
        add(cbore_for_m4_hex_socket_head_cap_screw1, mode=Mode.SUBTRACT)

    # CBORE for M4 Hex Socket Head Cap Scr 12: CBORE for M4 Hex Socket Head Cap Screw1 ×2
    with Locations(*[Vector(-0.7071067811867687, 0, 0.7071067811863263) * (i * CBORE_FOR_M4_HEX_SOCKET_HEAD_CAP_SCR_12_PITCH) for i in range(1, CBORE_FOR_M4_HEX_SOCKET_HEAD_CAP_SCR_12_COUNT)]):
        add(cbore_for_m4_hex_socket_head_cap_screw1, mode=Mode.SUBTRACT)


with BuildPart() as cut_revolve2_tool:
    # Sketch69 → Cut-Revolve2 (revolve)
    with BuildSketch(Plane(origin=(0, 0, 0), x_dir=(0, 0, -1), z_dir=(1, 0, 0))):
        with Locations((55, 97.8)):
            Rectangle(SKETCH69_W, SKETCH69_H)
        with Locations((55, 50.2)):
            Rectangle(SKETCH69_W, SKETCH69_H)
    revolve(axis=Axis((0, 108.9, 0), (0, -1, 0)))


with BuildPart() as part_1:
    add(part.part)

    # Cut-Revolve2: cut by cut_revolve2_tool
    add(cut_revolve2_tool.part, mode=Mode.SUBTRACT)

    # Chamfer5
    chamfer5_edges = [part_1.edges().sort_by_distance(p)[0] for p in [
        (0, -18.5, 42.5),
        (0, 78, 42.5),
    ]]
    chamfer(chamfer5_edges, length=CHAMFER5_SIZE - 0.0001)  # a hair under: the kernel refuses the full size

    # Chamfer3
    chamfer3_edges = [part_1.edges().sort_by_distance(p)[0] for p in [
        (0, 95, 20.25),
    ]]
    chamfer(chamfer3_edges, length=CHAMFER3_SIZE)

    # M6 Tapped Hole3: read off the stored shape, not the designer's step
    # M6 Tapped Hole3 outline → M6 Tapped Hole3 (cut)
    with BuildSketch(Plane.XY.offset(M6_START)):
        with Locations((0, -6.3)):
            Circle(M6_TAPPED_HOLE3_OUTLINE_R)
        with Locations((0, 23.7)):
            Circle(M6_TAPPED_HOLE3_OUTLINE_R)
    extrude(amount=M6_TAPPED_HOLE3_DEPTH, mode=Mode.SUBTRACT)

    # Chamfer6
    chamfer6_edges = [part_1.edges().sort_by_distance(p)[0] for p in [
        (0, 57.7, 55.5),
        (0, -32.5, 42.5),
    ]]
    chamfer(chamfer6_edges, length=CHAMFER6_SIZE)

    # Fillet4
    fillet4_edges = [part_1.edges().sort_by_distance(p)[0] for p in [
        (0, 91, 42.5),
        (0, 90.3, 45.5),
        (0, -32.5, 50.5),
    ]]
    fillet(fillet4_edges, radius=FILLET4_R)

    # Chamfer7
    chamfer7_edges = [part_1.edges().sort_by_distance(p)[0] for p in [
        (0, 98, 45.5),
    ]]
    chamfer7_side = [part_1.faces().sort_by_distance(p)[0] for p in [
        (0, 98, 30.936934342),
    ]]
    chamfer(chamfer7_edges, length=CHAMFER7_SIZE, length2=CHAMFER7_SIZE2, reference=chamfer7_side[0])

    # Chamfer8
    chamfer8_edges = [part_1.edges().sort_by_distance(p)[0] for p in [
        (0, -36, 50.5),
    ]]
    chamfer8_side = [part_1.faces().sort_by_distance(p)[0] for p in [
        (0, -36, 52.041492783),
    ]]
    chamfer(chamfer8_edges, length=CHAMFER8_SIZE, length2=CHAMFER8_SIZE2, reference=chamfer8_side[0])


with BuildPart() as body_3_1:
    add(body_3.part)

    # Cut-Revolve2: cut by cut_revolve2_tool
    add(cut_revolve2_tool.part, mode=Mode.SUBTRACT)

    # Move Face3: a face moved inward by 1.0
    extrude(body_3_1.faces().sort_by_distance((44.4, 90.3, -27.75))[0], amount=MOVE_FACE3_BY, dir=(0, 1, 0), mode=Mode.SUBTRACT)

    # Chamfer1
    chamfer1_edges = [body_3_1.edges().sort_by_distance(p)[0] for p in [
        (0, 91.3, 45.5),
    ]]
    chamfer(chamfer1_edges, length=CHAMFER1_SIZE)

    # Chamfer2
    chamfer2_edges = [body_3_1.edges().sort_by_distance(p)[0] for p in [
        (0, 91.3, 55.5),
    ]]
    chamfer(chamfer2_edges, length=CHAMFER2_SIZE)


solid = body_3_1.part
